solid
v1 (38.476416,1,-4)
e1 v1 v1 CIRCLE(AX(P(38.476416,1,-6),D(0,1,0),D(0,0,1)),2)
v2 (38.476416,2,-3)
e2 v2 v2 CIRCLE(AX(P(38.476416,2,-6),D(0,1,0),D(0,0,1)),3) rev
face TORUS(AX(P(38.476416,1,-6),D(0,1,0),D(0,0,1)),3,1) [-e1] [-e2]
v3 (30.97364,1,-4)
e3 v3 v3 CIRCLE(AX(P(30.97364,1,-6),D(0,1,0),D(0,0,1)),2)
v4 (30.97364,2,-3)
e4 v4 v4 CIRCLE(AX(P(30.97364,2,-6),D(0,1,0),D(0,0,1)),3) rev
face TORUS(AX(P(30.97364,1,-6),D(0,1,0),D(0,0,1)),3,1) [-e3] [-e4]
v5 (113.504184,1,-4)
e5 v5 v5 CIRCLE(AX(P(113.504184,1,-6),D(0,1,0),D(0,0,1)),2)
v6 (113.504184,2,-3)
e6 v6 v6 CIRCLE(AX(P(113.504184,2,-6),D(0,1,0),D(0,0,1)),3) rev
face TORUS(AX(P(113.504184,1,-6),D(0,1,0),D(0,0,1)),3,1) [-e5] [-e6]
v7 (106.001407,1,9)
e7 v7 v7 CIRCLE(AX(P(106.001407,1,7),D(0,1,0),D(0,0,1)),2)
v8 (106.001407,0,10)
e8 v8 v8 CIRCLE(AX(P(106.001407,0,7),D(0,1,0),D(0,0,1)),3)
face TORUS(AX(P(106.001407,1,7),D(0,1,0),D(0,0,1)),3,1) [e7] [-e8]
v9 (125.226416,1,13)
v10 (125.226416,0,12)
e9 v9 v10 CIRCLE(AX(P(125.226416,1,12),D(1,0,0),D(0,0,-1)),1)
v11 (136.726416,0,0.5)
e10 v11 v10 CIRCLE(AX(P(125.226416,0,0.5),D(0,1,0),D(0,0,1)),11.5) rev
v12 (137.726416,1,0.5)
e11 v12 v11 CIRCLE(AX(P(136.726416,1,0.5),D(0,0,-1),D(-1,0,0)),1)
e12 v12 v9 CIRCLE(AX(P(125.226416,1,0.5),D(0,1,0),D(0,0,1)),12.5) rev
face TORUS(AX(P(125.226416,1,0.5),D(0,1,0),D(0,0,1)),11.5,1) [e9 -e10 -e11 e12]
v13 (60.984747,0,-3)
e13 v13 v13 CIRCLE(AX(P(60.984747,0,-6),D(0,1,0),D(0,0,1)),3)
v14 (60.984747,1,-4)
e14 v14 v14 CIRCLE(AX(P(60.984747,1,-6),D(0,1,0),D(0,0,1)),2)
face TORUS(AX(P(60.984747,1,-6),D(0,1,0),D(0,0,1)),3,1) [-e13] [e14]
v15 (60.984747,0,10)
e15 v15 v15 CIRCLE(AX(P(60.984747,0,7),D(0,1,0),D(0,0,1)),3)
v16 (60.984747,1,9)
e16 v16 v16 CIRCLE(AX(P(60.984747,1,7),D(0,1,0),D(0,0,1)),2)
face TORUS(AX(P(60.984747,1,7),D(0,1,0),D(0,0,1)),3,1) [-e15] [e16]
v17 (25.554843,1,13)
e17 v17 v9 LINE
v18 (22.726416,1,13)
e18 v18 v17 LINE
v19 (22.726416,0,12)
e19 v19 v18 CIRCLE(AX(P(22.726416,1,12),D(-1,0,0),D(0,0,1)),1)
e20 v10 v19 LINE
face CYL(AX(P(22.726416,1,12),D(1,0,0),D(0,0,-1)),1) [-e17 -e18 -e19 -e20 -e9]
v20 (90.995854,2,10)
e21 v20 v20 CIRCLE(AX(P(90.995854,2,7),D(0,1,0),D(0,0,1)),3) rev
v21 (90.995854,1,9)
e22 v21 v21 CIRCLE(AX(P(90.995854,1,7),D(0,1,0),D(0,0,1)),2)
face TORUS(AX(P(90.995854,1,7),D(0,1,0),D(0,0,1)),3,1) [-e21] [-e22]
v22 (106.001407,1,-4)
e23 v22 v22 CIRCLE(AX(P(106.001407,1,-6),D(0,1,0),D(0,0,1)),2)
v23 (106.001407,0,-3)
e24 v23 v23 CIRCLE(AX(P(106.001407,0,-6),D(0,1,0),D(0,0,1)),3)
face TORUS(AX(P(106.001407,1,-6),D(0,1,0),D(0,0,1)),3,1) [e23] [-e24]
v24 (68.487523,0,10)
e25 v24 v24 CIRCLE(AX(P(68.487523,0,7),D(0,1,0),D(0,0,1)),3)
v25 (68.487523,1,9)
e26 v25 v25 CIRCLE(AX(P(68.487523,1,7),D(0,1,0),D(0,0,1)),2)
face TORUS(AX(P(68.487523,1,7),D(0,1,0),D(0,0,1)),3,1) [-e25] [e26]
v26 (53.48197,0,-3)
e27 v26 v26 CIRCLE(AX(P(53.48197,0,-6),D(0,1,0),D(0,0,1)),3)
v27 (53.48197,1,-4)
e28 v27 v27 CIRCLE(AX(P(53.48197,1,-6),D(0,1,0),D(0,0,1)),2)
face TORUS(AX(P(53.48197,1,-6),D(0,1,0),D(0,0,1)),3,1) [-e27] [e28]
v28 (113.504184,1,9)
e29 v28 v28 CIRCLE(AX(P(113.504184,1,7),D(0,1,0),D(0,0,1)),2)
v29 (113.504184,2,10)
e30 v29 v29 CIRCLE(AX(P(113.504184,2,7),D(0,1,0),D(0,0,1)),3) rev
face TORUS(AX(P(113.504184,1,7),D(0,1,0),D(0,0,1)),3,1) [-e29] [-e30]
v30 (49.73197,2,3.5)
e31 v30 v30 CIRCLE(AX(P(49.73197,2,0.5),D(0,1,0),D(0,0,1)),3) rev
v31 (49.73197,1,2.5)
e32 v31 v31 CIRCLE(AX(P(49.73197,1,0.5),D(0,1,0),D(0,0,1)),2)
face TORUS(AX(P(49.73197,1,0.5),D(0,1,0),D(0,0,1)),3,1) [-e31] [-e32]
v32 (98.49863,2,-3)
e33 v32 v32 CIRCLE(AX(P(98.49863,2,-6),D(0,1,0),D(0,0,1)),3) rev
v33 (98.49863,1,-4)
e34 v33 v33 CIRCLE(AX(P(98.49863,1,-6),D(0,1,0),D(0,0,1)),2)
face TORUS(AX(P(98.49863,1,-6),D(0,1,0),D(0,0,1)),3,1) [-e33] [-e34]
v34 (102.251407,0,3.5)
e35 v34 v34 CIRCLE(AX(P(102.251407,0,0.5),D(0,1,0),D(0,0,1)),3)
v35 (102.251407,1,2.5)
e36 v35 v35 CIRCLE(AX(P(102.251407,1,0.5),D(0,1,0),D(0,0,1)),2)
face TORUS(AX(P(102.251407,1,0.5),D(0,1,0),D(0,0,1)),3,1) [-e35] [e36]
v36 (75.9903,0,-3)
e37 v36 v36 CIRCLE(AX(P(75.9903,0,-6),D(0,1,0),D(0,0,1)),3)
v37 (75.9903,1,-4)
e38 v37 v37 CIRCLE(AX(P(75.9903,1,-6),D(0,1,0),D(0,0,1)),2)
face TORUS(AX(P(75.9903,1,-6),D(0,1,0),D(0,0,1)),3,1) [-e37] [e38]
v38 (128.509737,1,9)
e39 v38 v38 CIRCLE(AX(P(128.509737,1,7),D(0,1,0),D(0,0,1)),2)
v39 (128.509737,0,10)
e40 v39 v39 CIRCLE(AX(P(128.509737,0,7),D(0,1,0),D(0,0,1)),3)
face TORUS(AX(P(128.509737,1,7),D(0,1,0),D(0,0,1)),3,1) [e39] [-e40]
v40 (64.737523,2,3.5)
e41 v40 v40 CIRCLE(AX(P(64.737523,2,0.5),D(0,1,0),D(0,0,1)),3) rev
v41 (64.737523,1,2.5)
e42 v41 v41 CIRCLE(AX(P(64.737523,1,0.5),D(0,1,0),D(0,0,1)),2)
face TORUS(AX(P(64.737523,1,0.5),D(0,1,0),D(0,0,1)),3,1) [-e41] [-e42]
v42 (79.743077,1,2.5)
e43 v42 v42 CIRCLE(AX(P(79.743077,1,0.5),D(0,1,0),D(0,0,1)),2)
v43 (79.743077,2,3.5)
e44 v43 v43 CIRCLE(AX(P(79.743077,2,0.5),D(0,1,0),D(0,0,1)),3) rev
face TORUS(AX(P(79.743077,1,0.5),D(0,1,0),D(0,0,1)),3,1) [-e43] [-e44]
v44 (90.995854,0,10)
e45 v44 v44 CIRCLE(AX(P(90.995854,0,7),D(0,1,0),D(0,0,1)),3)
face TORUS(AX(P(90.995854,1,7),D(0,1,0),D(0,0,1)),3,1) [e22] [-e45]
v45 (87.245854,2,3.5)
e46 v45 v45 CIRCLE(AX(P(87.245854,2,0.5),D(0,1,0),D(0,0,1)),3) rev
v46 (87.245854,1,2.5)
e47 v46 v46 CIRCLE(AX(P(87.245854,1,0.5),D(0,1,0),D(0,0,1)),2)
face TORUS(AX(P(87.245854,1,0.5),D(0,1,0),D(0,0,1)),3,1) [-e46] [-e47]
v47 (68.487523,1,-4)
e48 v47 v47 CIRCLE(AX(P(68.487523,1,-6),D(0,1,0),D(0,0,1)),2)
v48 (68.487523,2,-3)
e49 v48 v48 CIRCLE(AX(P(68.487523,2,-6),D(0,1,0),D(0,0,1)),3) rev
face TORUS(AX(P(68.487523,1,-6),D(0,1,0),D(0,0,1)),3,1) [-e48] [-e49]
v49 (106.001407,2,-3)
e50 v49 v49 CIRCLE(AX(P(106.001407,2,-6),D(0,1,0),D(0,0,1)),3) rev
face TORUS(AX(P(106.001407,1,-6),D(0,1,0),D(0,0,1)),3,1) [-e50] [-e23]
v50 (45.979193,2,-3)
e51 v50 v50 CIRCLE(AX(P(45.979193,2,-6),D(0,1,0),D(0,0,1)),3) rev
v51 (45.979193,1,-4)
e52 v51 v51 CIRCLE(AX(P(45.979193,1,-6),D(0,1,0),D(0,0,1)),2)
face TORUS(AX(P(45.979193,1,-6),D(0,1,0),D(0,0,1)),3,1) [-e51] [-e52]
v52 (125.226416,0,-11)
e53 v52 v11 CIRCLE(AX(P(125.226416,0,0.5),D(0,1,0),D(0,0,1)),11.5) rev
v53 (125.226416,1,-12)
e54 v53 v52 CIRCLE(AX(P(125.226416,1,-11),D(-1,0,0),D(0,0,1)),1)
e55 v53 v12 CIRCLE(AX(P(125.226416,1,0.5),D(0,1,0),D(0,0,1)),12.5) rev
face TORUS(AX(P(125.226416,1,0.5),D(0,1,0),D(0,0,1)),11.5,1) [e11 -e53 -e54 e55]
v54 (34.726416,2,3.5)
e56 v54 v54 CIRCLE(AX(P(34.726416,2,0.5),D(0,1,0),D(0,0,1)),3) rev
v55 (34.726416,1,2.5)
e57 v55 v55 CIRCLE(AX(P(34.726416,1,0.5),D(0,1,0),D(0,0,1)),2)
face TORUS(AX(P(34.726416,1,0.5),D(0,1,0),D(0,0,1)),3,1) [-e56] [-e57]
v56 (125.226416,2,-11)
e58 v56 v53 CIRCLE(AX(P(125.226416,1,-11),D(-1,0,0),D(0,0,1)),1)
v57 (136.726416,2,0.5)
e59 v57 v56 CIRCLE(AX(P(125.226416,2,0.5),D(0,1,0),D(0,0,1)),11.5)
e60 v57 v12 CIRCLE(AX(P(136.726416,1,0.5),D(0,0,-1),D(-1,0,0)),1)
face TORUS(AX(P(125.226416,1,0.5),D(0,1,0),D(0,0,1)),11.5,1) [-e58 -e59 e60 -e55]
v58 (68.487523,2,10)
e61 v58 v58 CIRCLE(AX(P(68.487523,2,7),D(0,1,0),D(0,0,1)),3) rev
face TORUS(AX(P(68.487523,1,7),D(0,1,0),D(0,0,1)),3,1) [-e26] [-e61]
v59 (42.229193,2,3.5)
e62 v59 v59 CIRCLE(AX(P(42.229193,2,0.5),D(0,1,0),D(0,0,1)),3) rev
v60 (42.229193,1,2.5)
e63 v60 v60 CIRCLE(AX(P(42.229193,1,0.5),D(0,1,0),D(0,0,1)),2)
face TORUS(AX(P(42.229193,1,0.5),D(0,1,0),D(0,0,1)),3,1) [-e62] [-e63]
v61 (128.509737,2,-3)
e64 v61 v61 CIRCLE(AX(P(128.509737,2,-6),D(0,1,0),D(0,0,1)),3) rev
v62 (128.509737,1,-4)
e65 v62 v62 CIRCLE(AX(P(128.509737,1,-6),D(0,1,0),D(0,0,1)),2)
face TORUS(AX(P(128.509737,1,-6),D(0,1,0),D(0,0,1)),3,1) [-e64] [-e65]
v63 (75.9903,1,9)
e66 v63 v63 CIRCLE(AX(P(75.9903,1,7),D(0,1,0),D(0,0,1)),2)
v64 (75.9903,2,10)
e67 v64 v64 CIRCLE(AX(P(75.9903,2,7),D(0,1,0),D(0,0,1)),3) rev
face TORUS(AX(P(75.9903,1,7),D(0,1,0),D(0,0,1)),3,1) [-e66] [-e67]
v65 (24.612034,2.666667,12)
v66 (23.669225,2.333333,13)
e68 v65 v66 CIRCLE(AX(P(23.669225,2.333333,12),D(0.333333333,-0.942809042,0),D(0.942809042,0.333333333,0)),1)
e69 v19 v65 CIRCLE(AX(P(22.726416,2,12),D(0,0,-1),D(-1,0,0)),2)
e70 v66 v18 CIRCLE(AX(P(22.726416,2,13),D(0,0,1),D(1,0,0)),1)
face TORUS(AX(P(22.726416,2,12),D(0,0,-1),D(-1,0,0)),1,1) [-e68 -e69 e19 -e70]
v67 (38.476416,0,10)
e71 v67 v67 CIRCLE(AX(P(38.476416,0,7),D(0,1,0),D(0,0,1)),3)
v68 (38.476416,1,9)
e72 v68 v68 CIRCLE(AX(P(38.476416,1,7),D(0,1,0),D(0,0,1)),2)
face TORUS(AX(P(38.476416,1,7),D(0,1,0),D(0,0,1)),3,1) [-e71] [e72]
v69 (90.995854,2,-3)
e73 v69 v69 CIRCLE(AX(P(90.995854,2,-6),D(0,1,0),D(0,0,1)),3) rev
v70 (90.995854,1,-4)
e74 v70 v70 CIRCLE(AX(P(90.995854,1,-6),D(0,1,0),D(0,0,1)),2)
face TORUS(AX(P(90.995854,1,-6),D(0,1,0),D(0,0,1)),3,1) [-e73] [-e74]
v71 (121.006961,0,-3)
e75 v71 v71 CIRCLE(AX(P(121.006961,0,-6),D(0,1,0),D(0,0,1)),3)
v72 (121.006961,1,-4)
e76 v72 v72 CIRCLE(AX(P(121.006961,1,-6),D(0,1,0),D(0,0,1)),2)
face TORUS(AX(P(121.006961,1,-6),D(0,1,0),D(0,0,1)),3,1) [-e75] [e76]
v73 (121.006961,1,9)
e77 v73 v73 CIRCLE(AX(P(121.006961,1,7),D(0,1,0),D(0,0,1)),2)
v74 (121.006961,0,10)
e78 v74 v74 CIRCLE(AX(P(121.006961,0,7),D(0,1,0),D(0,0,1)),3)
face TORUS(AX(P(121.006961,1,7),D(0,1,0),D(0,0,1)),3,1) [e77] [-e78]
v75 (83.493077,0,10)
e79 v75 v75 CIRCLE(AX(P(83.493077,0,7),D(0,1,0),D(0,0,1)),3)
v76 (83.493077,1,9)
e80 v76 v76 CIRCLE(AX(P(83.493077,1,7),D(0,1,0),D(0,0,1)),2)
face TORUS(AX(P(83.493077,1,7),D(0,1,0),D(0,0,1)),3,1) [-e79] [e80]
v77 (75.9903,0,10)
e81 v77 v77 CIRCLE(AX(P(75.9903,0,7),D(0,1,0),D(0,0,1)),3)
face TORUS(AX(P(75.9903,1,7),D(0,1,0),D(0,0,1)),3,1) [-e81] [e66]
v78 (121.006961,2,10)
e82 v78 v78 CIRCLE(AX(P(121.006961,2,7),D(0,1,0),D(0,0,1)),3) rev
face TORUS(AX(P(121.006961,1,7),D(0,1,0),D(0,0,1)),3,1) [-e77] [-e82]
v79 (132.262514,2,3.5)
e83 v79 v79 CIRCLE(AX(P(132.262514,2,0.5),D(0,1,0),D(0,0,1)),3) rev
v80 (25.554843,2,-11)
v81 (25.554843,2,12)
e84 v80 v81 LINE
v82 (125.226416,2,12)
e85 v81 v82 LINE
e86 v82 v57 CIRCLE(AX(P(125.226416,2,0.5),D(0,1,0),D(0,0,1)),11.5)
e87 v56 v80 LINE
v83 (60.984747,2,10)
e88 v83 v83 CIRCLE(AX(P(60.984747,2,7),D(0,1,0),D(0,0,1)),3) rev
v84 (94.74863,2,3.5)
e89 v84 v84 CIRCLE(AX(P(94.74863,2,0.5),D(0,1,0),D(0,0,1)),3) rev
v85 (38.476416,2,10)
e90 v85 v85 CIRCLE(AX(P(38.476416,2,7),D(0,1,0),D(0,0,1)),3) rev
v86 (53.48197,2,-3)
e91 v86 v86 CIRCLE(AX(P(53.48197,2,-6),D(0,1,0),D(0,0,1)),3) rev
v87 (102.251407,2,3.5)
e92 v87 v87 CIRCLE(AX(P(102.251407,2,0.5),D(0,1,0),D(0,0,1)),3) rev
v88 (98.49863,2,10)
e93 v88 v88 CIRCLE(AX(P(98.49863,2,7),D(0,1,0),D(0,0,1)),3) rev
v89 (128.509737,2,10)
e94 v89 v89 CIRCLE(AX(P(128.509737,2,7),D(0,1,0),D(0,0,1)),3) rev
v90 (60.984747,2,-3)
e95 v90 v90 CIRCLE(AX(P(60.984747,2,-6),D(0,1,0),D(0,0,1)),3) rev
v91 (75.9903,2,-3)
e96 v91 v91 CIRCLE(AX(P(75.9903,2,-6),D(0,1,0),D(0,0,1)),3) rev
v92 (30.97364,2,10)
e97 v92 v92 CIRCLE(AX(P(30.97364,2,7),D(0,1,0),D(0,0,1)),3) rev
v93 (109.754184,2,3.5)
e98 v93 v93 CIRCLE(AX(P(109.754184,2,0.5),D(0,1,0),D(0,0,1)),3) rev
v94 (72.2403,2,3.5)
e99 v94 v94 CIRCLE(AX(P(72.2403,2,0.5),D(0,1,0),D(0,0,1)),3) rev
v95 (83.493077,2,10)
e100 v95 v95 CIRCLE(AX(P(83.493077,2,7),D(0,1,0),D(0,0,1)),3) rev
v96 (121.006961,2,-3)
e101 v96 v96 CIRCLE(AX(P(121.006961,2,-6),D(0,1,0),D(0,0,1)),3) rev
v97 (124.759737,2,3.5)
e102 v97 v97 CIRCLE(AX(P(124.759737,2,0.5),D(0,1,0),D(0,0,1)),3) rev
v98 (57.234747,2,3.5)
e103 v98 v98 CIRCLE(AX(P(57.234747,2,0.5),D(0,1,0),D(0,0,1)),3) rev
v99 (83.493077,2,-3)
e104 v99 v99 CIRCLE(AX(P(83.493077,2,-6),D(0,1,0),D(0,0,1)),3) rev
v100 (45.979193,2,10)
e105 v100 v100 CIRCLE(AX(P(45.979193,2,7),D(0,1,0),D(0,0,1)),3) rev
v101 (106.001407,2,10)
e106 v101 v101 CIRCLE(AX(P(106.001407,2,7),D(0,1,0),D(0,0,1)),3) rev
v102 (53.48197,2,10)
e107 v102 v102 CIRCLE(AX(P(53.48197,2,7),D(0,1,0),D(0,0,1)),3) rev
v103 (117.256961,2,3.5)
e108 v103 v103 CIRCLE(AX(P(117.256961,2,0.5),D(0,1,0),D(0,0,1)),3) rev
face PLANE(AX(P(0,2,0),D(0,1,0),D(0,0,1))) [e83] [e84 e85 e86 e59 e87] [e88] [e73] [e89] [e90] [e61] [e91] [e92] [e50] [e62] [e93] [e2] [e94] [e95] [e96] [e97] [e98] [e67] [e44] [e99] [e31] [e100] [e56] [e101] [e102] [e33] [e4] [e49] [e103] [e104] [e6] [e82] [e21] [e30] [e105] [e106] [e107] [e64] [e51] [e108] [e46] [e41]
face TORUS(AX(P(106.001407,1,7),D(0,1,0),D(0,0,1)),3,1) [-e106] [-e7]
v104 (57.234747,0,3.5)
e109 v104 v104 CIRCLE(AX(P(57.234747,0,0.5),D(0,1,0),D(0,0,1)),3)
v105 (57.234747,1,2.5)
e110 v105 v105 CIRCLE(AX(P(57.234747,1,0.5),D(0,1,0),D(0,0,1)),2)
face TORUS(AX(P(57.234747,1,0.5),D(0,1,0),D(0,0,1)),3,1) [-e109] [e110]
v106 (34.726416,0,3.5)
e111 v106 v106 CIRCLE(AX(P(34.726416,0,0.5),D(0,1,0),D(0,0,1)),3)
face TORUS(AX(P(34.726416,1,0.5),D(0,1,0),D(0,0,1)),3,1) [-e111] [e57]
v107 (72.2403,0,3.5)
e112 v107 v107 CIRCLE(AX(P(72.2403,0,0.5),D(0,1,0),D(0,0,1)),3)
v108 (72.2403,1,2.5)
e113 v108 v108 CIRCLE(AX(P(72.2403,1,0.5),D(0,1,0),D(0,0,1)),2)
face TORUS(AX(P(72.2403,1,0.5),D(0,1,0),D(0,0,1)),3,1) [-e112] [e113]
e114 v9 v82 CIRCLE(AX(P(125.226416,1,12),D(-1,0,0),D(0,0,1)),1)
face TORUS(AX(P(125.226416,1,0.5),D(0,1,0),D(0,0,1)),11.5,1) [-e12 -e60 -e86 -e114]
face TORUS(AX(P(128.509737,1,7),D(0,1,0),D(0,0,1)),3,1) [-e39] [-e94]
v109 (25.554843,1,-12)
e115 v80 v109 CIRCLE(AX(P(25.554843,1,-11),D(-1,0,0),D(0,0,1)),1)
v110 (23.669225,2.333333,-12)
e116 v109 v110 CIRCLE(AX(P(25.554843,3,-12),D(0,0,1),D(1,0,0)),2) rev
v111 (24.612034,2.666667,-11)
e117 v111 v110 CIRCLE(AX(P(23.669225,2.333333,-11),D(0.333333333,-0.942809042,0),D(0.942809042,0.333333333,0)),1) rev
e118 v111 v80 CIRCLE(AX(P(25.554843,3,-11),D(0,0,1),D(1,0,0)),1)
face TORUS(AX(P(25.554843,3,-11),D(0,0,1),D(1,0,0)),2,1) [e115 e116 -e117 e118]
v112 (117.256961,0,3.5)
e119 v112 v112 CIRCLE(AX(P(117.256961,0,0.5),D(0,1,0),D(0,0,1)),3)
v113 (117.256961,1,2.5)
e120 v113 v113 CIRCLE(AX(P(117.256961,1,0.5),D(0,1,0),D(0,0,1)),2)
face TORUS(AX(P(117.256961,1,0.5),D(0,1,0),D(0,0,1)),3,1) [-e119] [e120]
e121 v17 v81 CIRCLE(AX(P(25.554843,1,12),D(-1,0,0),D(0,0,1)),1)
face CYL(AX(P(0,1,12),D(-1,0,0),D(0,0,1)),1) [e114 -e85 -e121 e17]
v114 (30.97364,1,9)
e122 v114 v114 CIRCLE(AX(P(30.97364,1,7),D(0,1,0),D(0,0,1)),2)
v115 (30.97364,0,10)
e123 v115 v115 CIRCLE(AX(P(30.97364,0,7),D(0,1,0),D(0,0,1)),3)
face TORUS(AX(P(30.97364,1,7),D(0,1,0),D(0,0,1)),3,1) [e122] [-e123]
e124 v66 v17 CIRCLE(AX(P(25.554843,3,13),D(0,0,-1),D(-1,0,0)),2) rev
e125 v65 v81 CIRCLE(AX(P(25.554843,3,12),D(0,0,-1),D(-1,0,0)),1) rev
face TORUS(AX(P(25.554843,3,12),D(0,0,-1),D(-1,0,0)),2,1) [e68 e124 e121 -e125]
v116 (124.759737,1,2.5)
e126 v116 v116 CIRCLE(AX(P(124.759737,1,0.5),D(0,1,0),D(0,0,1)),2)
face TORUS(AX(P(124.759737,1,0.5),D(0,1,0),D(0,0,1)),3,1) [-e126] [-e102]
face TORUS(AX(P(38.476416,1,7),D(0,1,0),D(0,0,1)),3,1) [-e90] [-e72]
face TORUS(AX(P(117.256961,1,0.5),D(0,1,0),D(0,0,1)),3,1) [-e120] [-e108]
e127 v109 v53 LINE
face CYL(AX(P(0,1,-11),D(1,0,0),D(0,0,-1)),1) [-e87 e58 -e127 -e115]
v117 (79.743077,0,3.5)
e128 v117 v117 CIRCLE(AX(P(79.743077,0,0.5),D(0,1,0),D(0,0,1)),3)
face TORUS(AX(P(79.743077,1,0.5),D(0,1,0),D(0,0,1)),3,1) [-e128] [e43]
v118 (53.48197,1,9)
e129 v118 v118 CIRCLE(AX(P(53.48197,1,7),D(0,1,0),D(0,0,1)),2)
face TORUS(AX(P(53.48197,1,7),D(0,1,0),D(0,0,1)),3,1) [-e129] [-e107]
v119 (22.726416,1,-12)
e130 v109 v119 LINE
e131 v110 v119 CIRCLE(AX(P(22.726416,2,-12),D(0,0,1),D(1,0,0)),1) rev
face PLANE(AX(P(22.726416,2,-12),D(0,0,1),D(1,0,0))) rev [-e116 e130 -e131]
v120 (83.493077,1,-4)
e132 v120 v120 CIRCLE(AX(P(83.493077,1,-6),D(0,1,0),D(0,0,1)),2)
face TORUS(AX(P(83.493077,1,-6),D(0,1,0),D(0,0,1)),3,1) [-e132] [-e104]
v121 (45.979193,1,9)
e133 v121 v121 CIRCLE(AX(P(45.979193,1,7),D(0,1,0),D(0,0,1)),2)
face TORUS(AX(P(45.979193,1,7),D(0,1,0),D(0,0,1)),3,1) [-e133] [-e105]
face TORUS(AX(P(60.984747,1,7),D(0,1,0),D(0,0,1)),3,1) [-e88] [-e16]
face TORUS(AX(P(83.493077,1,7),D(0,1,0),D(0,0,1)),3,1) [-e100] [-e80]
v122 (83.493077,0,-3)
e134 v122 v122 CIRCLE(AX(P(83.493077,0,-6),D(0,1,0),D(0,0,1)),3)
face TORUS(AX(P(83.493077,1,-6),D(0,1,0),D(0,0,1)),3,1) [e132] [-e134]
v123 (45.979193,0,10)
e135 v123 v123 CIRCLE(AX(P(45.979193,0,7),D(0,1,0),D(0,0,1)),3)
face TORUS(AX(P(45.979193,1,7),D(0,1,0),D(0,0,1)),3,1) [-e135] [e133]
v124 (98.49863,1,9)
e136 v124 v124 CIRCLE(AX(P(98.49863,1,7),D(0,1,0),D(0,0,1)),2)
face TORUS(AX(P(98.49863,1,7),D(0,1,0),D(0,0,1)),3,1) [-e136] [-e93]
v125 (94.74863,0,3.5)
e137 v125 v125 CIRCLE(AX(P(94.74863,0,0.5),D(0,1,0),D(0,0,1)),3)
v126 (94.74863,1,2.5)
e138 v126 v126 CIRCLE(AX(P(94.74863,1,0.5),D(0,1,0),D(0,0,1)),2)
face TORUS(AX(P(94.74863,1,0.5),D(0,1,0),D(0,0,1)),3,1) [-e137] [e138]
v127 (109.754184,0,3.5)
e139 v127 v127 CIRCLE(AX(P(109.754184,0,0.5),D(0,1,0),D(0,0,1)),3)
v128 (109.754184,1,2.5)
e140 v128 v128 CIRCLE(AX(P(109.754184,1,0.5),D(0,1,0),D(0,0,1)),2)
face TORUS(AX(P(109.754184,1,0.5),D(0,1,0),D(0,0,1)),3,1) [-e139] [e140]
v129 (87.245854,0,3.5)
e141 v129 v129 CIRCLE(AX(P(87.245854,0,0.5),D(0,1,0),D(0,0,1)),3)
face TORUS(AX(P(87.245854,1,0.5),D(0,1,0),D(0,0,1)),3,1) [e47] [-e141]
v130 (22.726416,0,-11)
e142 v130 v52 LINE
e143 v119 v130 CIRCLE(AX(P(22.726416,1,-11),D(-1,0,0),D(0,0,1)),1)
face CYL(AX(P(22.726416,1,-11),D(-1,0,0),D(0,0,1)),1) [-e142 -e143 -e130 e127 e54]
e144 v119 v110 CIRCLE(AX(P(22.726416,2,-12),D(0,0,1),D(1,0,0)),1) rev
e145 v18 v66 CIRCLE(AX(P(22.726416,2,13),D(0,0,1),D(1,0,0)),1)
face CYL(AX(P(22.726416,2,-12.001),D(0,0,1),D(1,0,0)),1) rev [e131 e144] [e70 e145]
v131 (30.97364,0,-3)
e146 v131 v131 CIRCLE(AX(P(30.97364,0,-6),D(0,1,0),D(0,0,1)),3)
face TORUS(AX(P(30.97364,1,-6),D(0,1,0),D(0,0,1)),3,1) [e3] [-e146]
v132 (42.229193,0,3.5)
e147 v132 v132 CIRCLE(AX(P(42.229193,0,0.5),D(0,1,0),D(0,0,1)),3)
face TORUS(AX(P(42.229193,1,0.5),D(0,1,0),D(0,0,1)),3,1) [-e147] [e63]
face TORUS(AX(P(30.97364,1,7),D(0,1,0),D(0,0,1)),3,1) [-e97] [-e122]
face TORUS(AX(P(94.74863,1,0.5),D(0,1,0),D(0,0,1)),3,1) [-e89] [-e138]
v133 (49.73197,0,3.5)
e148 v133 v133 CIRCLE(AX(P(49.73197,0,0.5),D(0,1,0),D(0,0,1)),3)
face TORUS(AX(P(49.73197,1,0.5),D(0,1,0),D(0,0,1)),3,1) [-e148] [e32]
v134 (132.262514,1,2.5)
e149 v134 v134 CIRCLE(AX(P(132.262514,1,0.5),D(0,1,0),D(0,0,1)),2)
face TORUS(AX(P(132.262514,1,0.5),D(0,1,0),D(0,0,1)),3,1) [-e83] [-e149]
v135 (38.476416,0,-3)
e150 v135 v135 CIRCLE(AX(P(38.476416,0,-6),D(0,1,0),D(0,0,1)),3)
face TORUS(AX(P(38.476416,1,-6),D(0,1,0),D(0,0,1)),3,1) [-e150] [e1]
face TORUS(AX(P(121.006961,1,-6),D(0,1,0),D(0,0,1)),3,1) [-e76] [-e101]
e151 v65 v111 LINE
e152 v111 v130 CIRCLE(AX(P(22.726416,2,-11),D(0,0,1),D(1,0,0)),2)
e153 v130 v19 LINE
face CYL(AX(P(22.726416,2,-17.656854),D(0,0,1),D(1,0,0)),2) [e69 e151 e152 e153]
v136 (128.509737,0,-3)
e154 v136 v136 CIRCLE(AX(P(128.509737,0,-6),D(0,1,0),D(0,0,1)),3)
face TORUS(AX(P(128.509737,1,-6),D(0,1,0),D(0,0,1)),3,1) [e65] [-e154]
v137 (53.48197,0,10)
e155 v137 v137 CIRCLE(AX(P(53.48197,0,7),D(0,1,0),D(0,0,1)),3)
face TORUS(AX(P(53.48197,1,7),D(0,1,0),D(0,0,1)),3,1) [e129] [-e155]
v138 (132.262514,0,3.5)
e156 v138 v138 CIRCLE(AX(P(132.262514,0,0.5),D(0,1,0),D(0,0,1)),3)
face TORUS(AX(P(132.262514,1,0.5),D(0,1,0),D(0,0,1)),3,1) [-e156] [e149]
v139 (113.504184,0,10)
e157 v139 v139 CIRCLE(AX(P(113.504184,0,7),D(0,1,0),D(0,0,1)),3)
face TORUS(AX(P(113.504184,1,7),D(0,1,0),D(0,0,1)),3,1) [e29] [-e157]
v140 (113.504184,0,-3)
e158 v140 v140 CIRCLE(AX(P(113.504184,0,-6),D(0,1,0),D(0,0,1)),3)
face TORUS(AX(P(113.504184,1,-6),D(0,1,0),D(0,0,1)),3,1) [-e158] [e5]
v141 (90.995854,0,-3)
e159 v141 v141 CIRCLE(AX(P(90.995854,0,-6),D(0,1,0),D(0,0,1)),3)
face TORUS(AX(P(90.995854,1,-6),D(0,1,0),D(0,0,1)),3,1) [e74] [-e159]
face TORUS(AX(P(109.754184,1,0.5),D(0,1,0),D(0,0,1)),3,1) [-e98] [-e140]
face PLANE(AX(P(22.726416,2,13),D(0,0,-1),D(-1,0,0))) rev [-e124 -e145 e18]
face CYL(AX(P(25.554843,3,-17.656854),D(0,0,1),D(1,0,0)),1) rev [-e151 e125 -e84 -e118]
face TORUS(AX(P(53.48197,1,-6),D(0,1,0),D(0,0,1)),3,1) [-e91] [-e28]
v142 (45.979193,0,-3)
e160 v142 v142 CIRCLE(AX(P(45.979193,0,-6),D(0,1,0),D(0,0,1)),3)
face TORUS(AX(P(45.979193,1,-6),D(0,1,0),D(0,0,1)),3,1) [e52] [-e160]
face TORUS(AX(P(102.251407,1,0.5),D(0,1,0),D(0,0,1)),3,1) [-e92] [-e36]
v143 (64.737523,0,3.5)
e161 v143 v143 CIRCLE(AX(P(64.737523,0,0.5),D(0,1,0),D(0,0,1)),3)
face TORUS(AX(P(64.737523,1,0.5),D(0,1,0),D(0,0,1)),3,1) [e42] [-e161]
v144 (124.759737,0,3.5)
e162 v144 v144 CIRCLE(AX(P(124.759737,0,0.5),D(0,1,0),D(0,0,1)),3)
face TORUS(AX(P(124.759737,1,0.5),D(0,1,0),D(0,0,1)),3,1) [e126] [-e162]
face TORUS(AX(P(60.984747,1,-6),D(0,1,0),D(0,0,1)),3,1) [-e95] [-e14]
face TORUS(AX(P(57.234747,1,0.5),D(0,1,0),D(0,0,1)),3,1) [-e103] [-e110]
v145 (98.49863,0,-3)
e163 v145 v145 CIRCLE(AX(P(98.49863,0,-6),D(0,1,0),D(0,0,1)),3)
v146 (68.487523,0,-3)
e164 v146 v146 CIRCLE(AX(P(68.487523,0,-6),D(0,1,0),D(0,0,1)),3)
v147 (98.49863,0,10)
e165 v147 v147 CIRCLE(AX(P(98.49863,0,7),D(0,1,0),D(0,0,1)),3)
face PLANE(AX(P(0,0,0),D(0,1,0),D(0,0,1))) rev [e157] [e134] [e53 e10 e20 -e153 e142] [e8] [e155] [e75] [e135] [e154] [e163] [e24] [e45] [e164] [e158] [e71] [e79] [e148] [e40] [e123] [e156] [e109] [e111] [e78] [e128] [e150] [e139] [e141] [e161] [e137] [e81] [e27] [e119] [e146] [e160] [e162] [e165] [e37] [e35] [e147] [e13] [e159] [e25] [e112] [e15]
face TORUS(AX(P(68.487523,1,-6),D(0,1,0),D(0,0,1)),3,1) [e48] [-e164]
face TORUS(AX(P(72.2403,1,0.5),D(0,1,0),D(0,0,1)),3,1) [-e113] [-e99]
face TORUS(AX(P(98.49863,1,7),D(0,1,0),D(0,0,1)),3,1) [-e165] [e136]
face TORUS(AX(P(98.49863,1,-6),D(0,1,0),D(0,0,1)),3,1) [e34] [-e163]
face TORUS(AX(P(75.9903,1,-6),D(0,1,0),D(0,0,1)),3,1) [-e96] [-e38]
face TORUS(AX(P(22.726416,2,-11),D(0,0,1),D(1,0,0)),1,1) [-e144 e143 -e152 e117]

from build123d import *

# Parameters (mm, degrees)
SKETCH1_W           = 115
SKETCH1_H           = 25
BOSS_EXTRUDE1_DEPTH = 2
BOSS_EXTRUDE2_DEPTH = 25
CUT_EXTRUDE8_REACH  = 142.034
FILLET5_R           = 12.5
SKETCH4_R           = 2
CUT_EXTRUDE2_DEPTH  = 139.353047527
FILLET3_R           = 1


with BuildPart() as part:
    # Sketch1 → Boss-Extrude1 (new body)
    with BuildSketch(Plane(origin=(0, 0, 0), x_dir=(1, 0, 0), z_dir=(0, 1, 0))):
        with Locations((80.226416348, -0.5)):
            Rectangle(SKETCH1_W, SKETCH1_H)
    extrude(amount=BOSS_EXTRUDE1_DEPTH)

    # Sketch13 → Boss-Extrude2 (add)
    with BuildSketch(Plane.XY.offset(13)):
        with BuildLine():
            Line((24.726416348, 2), (23.726416348, 2))
            ThreePointArc((23.726416348, 2), (23.433523129, 1.292893219), (22.726416348, 1))
            Line((22.726416348, 1), (22.726416348, 0))
            ThreePointArc((22.726416348, 0), (24.14062991, 0.585786438), (24.726416348, 2))
        make_face()
        with BuildLine():
            ThreePointArc((22.726416348, 1), (22.019309566, 2.707106781), (23.726416348, 2))
            Line((23.726416348, 2), (24.726416348, 2))
            ThreePointArc((24.726416348, 2), (21.312202785, 3.414213562), (22.726416348, 0))
            Line((22.726416348, 0), (22.726416348, 1))
        make_face()
        with BuildLine():
            Line((22.726416348, 2), (23.726416348, 2))
            ThreePointArc((23.726416348, 2), (22.019309566, 2.707106781), (22.726416348, 1))
            Line((22.726416348, 1), (22.726416348, 2))
        make_face()
        with BuildLine():
            ThreePointArc((22.726416348, 1), (23.433523129, 1.292893219), (23.726416348, 2))
            Line((23.726416348, 2), (22.726416348, 2))
            Line((22.726416348, 2), (22.726416348, 1))
        make_face()
    extrude(amount=-BOSS_EXTRUDE2_DEPTH)

    # Sketch13<3> → Cut-Extrude8 (cut, up to next)
    with BuildSketch(Plane.XY.offset(13), mode=Mode.PRIVATE) as cut_extrude8_sk1:
        with BuildLine():
            Line((22.726416348, 2), (23.726416348, 2))
            ThreePointArc((23.726416348, 2), (22.019309566, 2.707106781), (22.726416348, 1))
            Line((22.726416348, 1), (22.726416348, 2))
        make_face()
    cut_extrude8_tool1 = extrude(cut_extrude8_sk1.sketch, amount=-CUT_EXTRUDE8_REACH, mode=Mode.PRIVATE) & part.part
    # Sketch13<3> → Cut-Extrude8 (cut, up to next)
    with BuildSketch(Plane.XY.offset(13), mode=Mode.PRIVATE) as cut_extrude8_sk2:
        with BuildLine():
            ThreePointArc((22.726416348, 1), (23.433523129, 1.292893219), (23.726416348, 2))
            Line((23.726416348, 2), (22.726416348, 2))
            Line((22.726416348, 2), (22.726416348, 1))
        make_face()
    cut_extrude8_tool2 = extrude(cut_extrude8_sk2.sketch, amount=-CUT_EXTRUDE8_REACH, mode=Mode.PRIVATE) & part.part
    # Sketch13<3> → Cut-Extrude8 (cut, up to next)
    with BuildSketch(Plane.XY.offset(13), mode=Mode.PRIVATE) as cut_extrude8_sk3:
        with BuildLine():
            Line((22.726416348, 2), (23.726416348, 2))
            ThreePointArc((23.726416348, 2), (22.019309566, 2.707106781), (22.726416348, 1))
            Line((22.726416348, 1), (22.726416348, 2))
        make_face()
    cut_extrude8_tool3 = extrude(cut_extrude8_sk3.sketch, amount=-CUT_EXTRUDE8_REACH, mode=Mode.PRIVATE) & part.part
    # Sketch13<3> → Cut-Extrude8 (cut, up to next)
    with BuildSketch(Plane.XY.offset(13), mode=Mode.PRIVATE) as cut_extrude8_sk4:
        with BuildLine():
            ThreePointArc((22.726416348, 1), (23.433523129, 1.292893219), (23.726416348, 2))
            Line((23.726416348, 2), (22.726416348, 2))
            Line((22.726416348, 2), (22.726416348, 1))
        make_face()
    cut_extrude8_tool4 = extrude(cut_extrude8_sk4.sketch, amount=-CUT_EXTRUDE8_REACH, mode=Mode.PRIVATE) & part.part
    add(cut_extrude8_tool1.solids().sort_by_distance((22.584945, 2.141471, 13))[0], mode=Mode.SUBTRACT)
    add(cut_extrude8_tool2.solids().sort_by_distance((23.15083, 1.575587, 13))[0], mode=Mode.SUBTRACT)
    add(cut_extrude8_tool3.solids().sort_by_distance((22.584945, 2.141471, 13))[0], mode=Mode.SUBTRACT)
    add(cut_extrude8_tool4.solids().sort_by_distance((23.15083, 1.575587, 13))[0], mode=Mode.SUBTRACT)

    # Fillet5
    fillet5_edges = [part.edges().sort_by_distance(p)[0] for p in [
        (137.726416348, 1, 13),
        (137.726416348, 1, -12),
    ]]
    fillet(fillet5_edges, radius=FILLET5_R - 0.0001)  # a hair under: the kernel refuses the full size

    # Sketch4 → Cut-Extrude2 (cut, through all)
    with BuildSketch(Plane(origin=(0, 2, 0), x_dir=(1, 0, 0), z_dir=(0, 1, 0))):
        with Locations(Location((30.973639598, 6, 0), (0, 0, 270))):
            Circle(SKETCH4_R)
        with Locations(Location((34.726416348, -0.5, 0), (0, 0, 270))):
            Circle(SKETCH4_R)
        with Locations(Location((30.973639598, -7, 0), (0, 0, 270))):
            Circle(SKETCH4_R)
        with Locations(Location((42.229193097, -0.5, 0), (0, 0, 270))):
            Circle(SKETCH4_R)
        with Locations(Location((38.476416348, 6, 0), (0, 0, 270))):
            Circle(SKETCH4_R)
        with Locations(Location((38.476416348, -7, 0), (0, 0, 270))):
            Circle(SKETCH4_R)
        with Locations(Location((49.731969847, -0.5, 0), (0, 0, 270))):
            Circle(SKETCH4_R)
        with Locations(Location((45.979193097, 6, 0), (0, 0, 270))):
            Circle(SKETCH4_R)
        with Locations(Location((45.979193097, -7, 0), (0, 0, 270))):
            Circle(SKETCH4_R)
        with Locations(Location((57.234746597, -0.5, 0), (0, 0, 270))):
            Circle(SKETCH4_R)
        with Locations(Location((53.481969847, 6, 0), (0, 0, 270))):
            Circle(SKETCH4_R)
        with Locations(Location((53.481969847, -7, 0), (0, 0, 270))):
            Circle(SKETCH4_R)
        with Locations(Location((64.737523346, -0.5, 0), (0, 0, 270))):
            Circle(SKETCH4_R)
        with Locations(Location((60.984746597, 6, 0), (0, 0, 270))):
            Circle(SKETCH4_R)
        with Locations(Location((60.984746597, -7, 0), (0, 0, 270))):
            Circle(SKETCH4_R)
        with Locations(Location((72.240300096, -0.5, 0), (0, 0, 270))):
            Circle(SKETCH4_R)
        with Locations(Location((68.487523346, 6, 0), (0, 0, 270))):
            Circle(SKETCH4_R)
        with Locations(Location((68.487523346, -7, 0), (0, 0, 270))):
            Circle(SKETCH4_R)
        with Locations(Location((79.743076846, -0.5, 0), (0, 0, 270))):
            Circle(SKETCH4_R)
        with Locations(Location((75.990300096, 6, 0), (0, 0, 270))):
            Circle(SKETCH4_R)
        with Locations(Location((75.990300096, -7, 0), (0, 0, 270))):
            Circle(SKETCH4_R)
        with Locations(Location((87.245853596, -0.5, 0), (0, 0, 270))):
            Circle(SKETCH4_R)
        with Locations(Location((83.493076846, 6, 0), (0, 0, 270))):
            Circle(SKETCH4_R)
        with Locations(Location((83.493076846, -7, 0), (0, 0, 270))):
            Circle(SKETCH4_R)
        with Locations(Location((94.748630345, -0.5, 0), (0, 0, 270))):
            Circle(SKETCH4_R)
        with Locations(Location((90.995853596, 6, 0), (0, 0, 270))):
            Circle(SKETCH4_R)
        with Locations(Location((90.995853596, -7, 0), (0, 0, 270))):
            Circle(SKETCH4_R)
        with Locations(Location((102.251407095, -0.5, 0), (0, 0, 270))):
            Circle(SKETCH4_R)
        with Locations(Location((98.498630345, 6, 0), (0, 0, 270))):
            Circle(SKETCH4_R)
        with Locations(Location((98.498630345, -7, 0), (0, 0, 270))):
            Circle(SKETCH4_R)
        with Locations(Location((109.754183845, -0.5, 0), (0, 0, 270))):
            Circle(SKETCH4_R)
        with Locations(Location((106.001407095, 6, 0), (0, 0, 270))):
            Circle(SKETCH4_R)
        with Locations(Location((106.001407095, -7, 0), (0, 0, 270))):
            Circle(SKETCH4_R)
        with Locations(Location((117.256960595, -0.5, 0), (0, 0, 270))):
            Circle(SKETCH4_R)
        with Locations(Location((113.504183845, 6, 0), (0, 0, 270))):
            Circle(SKETCH4_R)
        with Locations(Location((113.504183845, -7, 0), (0, 0, 270))):
            Circle(SKETCH4_R)
        with Locations(Location((124.759737344, -0.5, 0), (0, 0, 270))):
            Circle(SKETCH4_R)
        with Locations(Location((121.006960595, 6, 0), (0, 0, 270))):
            Circle(SKETCH4_R)
        with Locations(Location((121.006960595, -7, 0), (0, 0, 270))):
            Circle(SKETCH4_R)
        with Locations(Location((132.262514094, -0.5, 0), (0, 0, 270))):
            Circle(SKETCH4_R)
        with Locations(Location((128.509737344, 6, 0), (0, 0, 270))):
            Circle(SKETCH4_R)
        with Locations(Location((128.509737344, -7, 0), (0, 0, 270))):
            Circle(SKETCH4_R)
    extrude(amount=-CUT_EXTRUDE2_DEPTH, mode=Mode.SUBTRACT)

    # Fillet3
    fillet3_edges = [part.edges().sort_by_distance(p)[0] for p in [
        (73.976466348, 0, 13),
        (73.976466348, 0, -12),
        (30.973639598, 0, -8),
        (113.504183845, 0, 5),
        (117.256960595, 0, -1.5),
        (113.504183845, 0, -8),
        (60.984746597, 0, -8),
        (53.481969847, 0, 5),
        (57.234746597, 0, -1.5),
        (53.481969847, 0, -8),
        (72.240300096, 0, -1.5),
        (68.487523346, 0, -8),
        (60.984746597, 0, 5),
        (64.737523346, 0, -1.5),
        (42.229193097, 0, -1.5),
        (38.476416348, 0, -8),
        (30.973639598, 0, 5),
        (34.726416348, 0, -1.5),
        (45.979193097, 0, 5),
        (49.731969847, 0, -1.5),
        (45.979193097, 0, -8),
        (38.476416348, 0, 5),
        (102.251407095, 0, -1.5),
        (98.498630345, 0, -8),
        (90.995853596, 0, 5),
        (94.748630345, 0, -1.5),
        (106.001407095, 0, 5),
        (109.754183845, 0, -1.5),
        (106.001407095, 0, -8),
        (98.498630345, 0, 5),
        (75.990300096, 0, 5),
        (79.743076846, 0, -1.5),
        (75.990300096, 0, -8),
        (68.487523346, 0, 5),
        (90.995853596, 0, -8),
        (83.493076846, 0, 5),
        (87.245853596, 0, -1.5),
        (83.493076846, 0, -8),
        (74.976466348, 2, 13),
        (74.976466348, 2, -12),
        (30.973639598, 2, -8),
        (113.504183845, 2, 5),
        (117.256960595, 2, -1.5),
        (113.504183845, 2, -8),
        (60.984746597, 2, -8),
        (53.481969847, 2, 5),
        (57.234746597, 2, -1.5),
        (53.481969847, 2, -8),
        (72.240300096, 2, -1.5),
        (68.487523346, 2, -8),
        (60.984746597, 2, 5),
        (64.737523346, 2, -1.5),
        (42.229193097, 2, -1.5),
        (38.476416348, 2, -8),
        (30.973639598, 2, 5),
        (34.726416348, 2, -1.5),
        (45.979193097, 2, 5),
        (49.731969847, 2, -1.5),
        (45.979193097, 2, -8),
        (38.476416348, 2, 5),
        (102.251407095, 2, -1.5),
        (98.498630345, 2, -8),
        (90.995853596, 2, 5),
        (94.748630345, 2, -1.5),
        (106.001407095, 2, 5),
        (109.754183845, 2, -1.5),
        (106.001407095, 2, -8),
        (98.498630345, 2, 5),
        (75.990300096, 2, 5),
        (79.743076846, 2, -1.5),
        (75.990300096, 2, -8),
        (68.487523346, 2, 5),
        (90.995853596, 2, -8),
        (83.493076846, 2, 5),
        (87.245853596, 2, -1.5),
        (83.493076846, 2, -8),
        (128.509737344, 0, -8),
        (128.509737344, 2, -8),
        (132.262514094, 0, -1.5),
        (121.006960595, 0, 5),
        (128.509737344, 0, 5),
        (121.006960595, 0, -8),
        (124.759737344, 0, -1.5),
        (132.262514094, 2, -1.5),
        (121.006960595, 2, 5),
        (128.509737344, 2, 5),
        (121.006960595, 2, -8),
        (124.759737344, 2, -1.5),
        (134.065280402, 0, 9.338864054),
        (134.065280402, 0, -8.338864054),
        (134.065280402, 2, -8.338864054),
        (134.065280402, 2, 9.338864054),
        (21.312202785, 3.414213562, 13),
        (21.312202785, 3.414213562, -12),
        (24.726416348, 2, 0.5),
    ]]
    fillet(fillet3_edges, radius=FILLET3_R - 0.0001)  # a hair under: the kernel refuses the full size


solid = part.part
